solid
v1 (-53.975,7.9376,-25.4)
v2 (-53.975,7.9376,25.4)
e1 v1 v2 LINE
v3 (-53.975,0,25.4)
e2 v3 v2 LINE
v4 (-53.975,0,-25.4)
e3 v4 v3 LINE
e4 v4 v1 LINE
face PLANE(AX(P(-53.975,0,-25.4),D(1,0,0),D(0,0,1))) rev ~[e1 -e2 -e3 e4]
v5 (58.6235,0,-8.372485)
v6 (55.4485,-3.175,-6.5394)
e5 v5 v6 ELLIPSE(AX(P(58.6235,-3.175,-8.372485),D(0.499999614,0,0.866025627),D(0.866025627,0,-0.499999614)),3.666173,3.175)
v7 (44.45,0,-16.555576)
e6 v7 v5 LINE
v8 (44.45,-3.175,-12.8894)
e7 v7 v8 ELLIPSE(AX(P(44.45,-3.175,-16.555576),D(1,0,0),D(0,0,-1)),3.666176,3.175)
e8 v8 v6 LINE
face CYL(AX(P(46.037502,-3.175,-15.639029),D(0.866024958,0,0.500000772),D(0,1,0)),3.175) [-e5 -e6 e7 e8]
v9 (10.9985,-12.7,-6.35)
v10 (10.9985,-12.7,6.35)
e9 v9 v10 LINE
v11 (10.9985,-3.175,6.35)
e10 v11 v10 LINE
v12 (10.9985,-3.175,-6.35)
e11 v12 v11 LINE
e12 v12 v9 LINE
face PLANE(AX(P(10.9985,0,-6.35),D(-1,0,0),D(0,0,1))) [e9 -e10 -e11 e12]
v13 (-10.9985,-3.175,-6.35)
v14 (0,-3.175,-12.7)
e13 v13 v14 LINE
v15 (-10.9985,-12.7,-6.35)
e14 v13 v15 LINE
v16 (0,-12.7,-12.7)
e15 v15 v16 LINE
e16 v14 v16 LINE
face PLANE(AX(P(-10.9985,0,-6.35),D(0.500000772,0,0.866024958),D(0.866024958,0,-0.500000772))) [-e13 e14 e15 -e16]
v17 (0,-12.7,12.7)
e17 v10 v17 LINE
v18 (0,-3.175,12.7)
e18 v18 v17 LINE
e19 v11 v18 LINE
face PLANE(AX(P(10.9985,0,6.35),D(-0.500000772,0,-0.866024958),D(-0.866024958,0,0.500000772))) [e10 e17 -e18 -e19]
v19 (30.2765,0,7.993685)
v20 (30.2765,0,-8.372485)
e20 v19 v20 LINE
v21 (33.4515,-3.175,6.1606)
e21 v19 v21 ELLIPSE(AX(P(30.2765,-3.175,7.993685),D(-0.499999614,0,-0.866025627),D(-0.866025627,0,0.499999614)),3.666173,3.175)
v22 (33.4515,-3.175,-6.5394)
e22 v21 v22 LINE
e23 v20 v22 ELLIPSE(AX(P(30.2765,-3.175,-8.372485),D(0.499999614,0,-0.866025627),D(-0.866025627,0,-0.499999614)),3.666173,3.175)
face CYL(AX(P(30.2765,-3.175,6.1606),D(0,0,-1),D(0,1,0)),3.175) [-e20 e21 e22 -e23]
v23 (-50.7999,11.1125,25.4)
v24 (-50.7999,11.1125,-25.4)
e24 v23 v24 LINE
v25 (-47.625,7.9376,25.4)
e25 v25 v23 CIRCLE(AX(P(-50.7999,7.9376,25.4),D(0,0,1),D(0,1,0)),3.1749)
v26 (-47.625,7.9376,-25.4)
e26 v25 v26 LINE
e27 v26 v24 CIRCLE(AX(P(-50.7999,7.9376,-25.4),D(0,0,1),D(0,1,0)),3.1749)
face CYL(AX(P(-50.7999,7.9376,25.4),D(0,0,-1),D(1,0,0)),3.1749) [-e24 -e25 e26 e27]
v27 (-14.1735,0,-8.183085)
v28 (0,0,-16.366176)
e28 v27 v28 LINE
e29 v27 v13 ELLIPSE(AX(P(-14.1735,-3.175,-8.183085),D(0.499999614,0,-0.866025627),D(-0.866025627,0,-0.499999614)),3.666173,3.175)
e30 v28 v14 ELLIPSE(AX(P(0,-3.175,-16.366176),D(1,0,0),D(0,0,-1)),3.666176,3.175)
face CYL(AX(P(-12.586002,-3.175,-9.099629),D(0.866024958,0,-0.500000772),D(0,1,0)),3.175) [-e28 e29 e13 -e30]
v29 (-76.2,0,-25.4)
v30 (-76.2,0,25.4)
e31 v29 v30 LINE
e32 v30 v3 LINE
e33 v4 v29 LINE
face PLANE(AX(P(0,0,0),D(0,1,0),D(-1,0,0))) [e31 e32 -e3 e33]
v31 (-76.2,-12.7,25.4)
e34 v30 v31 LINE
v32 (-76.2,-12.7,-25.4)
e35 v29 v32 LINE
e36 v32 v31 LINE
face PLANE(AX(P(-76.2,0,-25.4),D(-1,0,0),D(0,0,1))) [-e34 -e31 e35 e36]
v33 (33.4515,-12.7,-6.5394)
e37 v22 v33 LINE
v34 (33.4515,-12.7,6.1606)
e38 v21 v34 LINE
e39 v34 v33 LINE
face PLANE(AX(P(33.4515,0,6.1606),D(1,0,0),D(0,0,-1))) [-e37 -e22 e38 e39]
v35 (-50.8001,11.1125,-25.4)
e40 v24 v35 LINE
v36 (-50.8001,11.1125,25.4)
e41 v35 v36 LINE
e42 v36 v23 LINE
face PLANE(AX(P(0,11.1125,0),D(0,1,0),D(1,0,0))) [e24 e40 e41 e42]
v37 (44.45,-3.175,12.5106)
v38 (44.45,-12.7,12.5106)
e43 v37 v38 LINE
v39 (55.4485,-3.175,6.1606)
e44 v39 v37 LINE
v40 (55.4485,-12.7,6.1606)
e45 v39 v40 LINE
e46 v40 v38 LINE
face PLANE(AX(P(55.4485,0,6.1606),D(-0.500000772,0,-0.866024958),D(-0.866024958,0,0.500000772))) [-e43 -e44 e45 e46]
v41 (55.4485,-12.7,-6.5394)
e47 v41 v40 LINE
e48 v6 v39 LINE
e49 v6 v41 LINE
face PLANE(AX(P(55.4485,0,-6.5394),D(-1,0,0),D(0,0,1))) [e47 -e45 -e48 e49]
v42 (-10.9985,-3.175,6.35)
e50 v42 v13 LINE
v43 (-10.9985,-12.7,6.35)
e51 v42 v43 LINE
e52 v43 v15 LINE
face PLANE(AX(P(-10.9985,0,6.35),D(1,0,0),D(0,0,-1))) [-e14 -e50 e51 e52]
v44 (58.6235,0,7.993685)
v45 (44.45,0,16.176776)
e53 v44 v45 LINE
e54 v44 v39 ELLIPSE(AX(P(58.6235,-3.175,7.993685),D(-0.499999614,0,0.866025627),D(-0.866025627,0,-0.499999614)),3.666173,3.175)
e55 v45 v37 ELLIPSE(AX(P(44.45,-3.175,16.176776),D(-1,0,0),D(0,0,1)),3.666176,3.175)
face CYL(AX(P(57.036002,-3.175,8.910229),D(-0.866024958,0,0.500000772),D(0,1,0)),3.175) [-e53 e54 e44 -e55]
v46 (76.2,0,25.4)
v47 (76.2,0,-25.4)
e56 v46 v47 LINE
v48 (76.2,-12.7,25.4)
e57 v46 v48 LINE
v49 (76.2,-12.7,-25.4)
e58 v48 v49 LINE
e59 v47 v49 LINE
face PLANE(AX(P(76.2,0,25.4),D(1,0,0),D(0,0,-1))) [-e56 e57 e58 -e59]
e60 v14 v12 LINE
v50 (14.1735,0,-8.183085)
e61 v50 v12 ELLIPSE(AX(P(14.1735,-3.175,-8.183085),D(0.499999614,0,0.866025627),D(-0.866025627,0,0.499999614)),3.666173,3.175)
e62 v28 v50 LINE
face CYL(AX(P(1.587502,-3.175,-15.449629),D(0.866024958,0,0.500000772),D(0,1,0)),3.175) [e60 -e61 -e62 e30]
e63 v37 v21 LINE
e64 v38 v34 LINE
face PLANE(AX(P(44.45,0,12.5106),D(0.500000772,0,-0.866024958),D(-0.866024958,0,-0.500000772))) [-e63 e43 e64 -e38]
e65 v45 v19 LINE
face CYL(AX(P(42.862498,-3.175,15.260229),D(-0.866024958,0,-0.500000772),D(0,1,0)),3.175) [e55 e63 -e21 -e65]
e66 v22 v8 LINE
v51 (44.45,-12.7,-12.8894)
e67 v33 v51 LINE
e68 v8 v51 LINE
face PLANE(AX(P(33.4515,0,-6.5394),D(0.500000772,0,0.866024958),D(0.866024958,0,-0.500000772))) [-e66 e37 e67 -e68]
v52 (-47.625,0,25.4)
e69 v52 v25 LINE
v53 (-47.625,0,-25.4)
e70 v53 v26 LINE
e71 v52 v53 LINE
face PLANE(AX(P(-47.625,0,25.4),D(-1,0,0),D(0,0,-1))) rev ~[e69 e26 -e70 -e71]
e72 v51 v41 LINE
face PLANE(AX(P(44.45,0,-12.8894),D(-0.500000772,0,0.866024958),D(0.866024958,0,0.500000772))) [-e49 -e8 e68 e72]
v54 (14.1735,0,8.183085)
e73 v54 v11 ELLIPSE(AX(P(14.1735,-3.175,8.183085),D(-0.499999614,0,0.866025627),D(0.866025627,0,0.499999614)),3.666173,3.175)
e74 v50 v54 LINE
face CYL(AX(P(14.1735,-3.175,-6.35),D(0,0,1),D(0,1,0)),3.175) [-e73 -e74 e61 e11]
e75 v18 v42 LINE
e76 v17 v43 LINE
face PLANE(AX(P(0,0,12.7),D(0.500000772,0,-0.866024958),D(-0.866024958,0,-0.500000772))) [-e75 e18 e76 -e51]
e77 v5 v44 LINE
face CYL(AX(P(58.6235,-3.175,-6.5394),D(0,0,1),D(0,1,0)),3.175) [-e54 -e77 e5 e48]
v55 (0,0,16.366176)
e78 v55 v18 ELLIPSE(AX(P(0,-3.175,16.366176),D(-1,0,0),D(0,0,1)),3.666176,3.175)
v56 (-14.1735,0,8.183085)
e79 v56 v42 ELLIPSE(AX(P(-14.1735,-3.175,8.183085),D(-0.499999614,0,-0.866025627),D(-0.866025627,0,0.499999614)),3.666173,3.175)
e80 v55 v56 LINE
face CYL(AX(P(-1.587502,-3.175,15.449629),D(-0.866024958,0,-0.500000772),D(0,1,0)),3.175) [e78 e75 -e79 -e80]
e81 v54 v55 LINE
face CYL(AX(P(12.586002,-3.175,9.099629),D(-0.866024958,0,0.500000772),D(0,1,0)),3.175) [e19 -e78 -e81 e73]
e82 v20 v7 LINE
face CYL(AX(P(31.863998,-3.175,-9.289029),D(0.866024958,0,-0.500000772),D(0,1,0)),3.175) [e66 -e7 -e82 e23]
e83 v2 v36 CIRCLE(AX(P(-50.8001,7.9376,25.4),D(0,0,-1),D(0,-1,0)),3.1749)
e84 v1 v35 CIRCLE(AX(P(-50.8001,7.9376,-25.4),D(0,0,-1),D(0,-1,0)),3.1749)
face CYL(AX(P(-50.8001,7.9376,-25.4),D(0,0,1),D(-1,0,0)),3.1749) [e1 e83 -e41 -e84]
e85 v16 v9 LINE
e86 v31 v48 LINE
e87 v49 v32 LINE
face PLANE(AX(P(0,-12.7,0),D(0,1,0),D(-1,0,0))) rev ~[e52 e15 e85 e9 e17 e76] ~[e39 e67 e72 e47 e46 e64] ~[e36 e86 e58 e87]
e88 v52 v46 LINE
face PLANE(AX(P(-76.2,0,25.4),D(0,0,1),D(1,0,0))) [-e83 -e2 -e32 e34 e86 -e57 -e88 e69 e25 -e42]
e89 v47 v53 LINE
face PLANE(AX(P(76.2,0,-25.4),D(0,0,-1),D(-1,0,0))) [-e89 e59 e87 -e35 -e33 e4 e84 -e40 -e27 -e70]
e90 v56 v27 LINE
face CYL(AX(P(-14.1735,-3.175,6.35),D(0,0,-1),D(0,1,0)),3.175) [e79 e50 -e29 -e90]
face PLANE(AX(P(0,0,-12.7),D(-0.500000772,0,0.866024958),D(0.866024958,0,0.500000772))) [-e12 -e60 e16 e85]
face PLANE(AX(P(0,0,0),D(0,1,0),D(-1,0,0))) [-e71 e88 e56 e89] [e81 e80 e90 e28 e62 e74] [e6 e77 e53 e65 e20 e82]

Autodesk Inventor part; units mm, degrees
ref_plane "YZ Plane" through (0, 0, 0) normal (1, 0, 0) x (0, 1, 0)
ref_plane "XZ Plane" through (0, 0, 0) normal (0, 1, 0) x (-1, 0, 0)
ref_plane "XY Plane" through (0, 0, 0) normal (0, 0, 1) x (1, 0, 0)
sketch "Sketch1" plane through (0, 0, 0) normal (0, 1, 0) x (-1, 0, 0)
  line L0 (-76.2, 25.4) -> (-76.2, -25.4)
  line L1 (-76.2, -25.4) -> (76.2, -25.4)
  line L2 (76.2, -25.4) -> (76.2, 25.4)
  line L3 (76.2, 25.4) -> (-76.2, 25.4)
  line L4 (-76.2, 25.4) -> (76.2, -25.4) construction
  line L5 (-76.2, -25.4) -> (76.2, 25.4) construction
  point P0 (0, 0)
  dimension "d0" = 50.8
  dimension "d1" = 152.4
extrude "Extrusion1" add sketch "Sketch1" against normal blind 12.7
sketch "Sketch2" plane through (0, 0, 0) normal (0, 1, 0) x (1, 0, 0)
  line L0 (-47.625, -25.4) -> (-47.625, 25.4)
  line L1 (-47.625, 25.4) -> (-53.975, 25.4)
  line L2 (-53.975, 25.4) -> (-53.975, -25.4)
  line L3 (-53.975, -25.4) -> (-47.625, -25.4)
  line L4 (-47.625, -25.4) -> (-53.975, 25.4) construction
  line L5 (-47.625, 25.4) -> (-53.975, -25.4) construction
  line L6 (-76.2, 25.4) -> (-76.2, -25.4) projected
  point P0 (0, 0)
  point P1 (-50.8, 0)
  dimension "d4" = 6.35
  dimension "d5" = 25.4
  dimension "d6" = 50.8
extrude "Extrusion2" add sketch "Sketch2" along normal blind 11.1125
fillet "Fillet1" radius 3.175 2 edges at (-47.625, 11.1125, 0) (-53.975, 11.1125, 0)
sketch "Sketch3" plane through (0, 0, 0) normal (0, 1, 0) x (1, 0, 0)
  line L0 (33.4515, -6.1606) -> (33.4515, 6.5394)
  line L1 (33.4515, 6.5394) -> (44.45, 12.8894)
  line L2 (44.45, 12.8894) -> (55.4485, 6.5394)
  line L3 (55.4485, 6.5394) -> (55.4485, -6.1606)
  line L4 (55.4485, -6.1606) -> (44.45, -12.5106)
  line L5 (44.45, -12.5106) -> (33.4515, -6.1606)
  line L6 (-10.9985, -6.35) -> (-10.9985, 6.35)
  line L7 (-10.9985, 6.35) -> (0, 12.7)
  line L8 (0, 12.7) -> (10.9985, 6.35)
  line L9 (10.9985, 6.35) -> (10.9985, -6.35)
  line L10 (10.9985, -6.35) -> (0, -12.7)
  line L11 (0, -12.7) -> (-10.9985, -6.35)
  line L12 (73.025, 22.225) -> (73.025, -22.225) projected
  point P0 (0, 0)
  point P1 (44.45, 0.1894)
  point P2 (0, 0)
  dimension "d12" = 25.4
  dimension "d13" = 44.45
extrude "Extrusion3" cut sketch "Sketch3" against normal through all
fillet "Fillet4" radius 3.175 12 edges at (49.9493, 0, 9.3356) (38.9507, 0, 9.3356) (33.4515, 0, -0.1894) (38.9507, 0, -9.7144) (49.9493, 0, -9.7144) (55.4485, 0, -0.1894) (10.9985, 0, 0) (5.4993, 0, 9.525) (-5.4993, 0, 9.525) (-10.9985, 0, 0) (-5.4993, 0, -9.525) (5.4993, 0, -9.525)
properties part number "Gap Guage"
